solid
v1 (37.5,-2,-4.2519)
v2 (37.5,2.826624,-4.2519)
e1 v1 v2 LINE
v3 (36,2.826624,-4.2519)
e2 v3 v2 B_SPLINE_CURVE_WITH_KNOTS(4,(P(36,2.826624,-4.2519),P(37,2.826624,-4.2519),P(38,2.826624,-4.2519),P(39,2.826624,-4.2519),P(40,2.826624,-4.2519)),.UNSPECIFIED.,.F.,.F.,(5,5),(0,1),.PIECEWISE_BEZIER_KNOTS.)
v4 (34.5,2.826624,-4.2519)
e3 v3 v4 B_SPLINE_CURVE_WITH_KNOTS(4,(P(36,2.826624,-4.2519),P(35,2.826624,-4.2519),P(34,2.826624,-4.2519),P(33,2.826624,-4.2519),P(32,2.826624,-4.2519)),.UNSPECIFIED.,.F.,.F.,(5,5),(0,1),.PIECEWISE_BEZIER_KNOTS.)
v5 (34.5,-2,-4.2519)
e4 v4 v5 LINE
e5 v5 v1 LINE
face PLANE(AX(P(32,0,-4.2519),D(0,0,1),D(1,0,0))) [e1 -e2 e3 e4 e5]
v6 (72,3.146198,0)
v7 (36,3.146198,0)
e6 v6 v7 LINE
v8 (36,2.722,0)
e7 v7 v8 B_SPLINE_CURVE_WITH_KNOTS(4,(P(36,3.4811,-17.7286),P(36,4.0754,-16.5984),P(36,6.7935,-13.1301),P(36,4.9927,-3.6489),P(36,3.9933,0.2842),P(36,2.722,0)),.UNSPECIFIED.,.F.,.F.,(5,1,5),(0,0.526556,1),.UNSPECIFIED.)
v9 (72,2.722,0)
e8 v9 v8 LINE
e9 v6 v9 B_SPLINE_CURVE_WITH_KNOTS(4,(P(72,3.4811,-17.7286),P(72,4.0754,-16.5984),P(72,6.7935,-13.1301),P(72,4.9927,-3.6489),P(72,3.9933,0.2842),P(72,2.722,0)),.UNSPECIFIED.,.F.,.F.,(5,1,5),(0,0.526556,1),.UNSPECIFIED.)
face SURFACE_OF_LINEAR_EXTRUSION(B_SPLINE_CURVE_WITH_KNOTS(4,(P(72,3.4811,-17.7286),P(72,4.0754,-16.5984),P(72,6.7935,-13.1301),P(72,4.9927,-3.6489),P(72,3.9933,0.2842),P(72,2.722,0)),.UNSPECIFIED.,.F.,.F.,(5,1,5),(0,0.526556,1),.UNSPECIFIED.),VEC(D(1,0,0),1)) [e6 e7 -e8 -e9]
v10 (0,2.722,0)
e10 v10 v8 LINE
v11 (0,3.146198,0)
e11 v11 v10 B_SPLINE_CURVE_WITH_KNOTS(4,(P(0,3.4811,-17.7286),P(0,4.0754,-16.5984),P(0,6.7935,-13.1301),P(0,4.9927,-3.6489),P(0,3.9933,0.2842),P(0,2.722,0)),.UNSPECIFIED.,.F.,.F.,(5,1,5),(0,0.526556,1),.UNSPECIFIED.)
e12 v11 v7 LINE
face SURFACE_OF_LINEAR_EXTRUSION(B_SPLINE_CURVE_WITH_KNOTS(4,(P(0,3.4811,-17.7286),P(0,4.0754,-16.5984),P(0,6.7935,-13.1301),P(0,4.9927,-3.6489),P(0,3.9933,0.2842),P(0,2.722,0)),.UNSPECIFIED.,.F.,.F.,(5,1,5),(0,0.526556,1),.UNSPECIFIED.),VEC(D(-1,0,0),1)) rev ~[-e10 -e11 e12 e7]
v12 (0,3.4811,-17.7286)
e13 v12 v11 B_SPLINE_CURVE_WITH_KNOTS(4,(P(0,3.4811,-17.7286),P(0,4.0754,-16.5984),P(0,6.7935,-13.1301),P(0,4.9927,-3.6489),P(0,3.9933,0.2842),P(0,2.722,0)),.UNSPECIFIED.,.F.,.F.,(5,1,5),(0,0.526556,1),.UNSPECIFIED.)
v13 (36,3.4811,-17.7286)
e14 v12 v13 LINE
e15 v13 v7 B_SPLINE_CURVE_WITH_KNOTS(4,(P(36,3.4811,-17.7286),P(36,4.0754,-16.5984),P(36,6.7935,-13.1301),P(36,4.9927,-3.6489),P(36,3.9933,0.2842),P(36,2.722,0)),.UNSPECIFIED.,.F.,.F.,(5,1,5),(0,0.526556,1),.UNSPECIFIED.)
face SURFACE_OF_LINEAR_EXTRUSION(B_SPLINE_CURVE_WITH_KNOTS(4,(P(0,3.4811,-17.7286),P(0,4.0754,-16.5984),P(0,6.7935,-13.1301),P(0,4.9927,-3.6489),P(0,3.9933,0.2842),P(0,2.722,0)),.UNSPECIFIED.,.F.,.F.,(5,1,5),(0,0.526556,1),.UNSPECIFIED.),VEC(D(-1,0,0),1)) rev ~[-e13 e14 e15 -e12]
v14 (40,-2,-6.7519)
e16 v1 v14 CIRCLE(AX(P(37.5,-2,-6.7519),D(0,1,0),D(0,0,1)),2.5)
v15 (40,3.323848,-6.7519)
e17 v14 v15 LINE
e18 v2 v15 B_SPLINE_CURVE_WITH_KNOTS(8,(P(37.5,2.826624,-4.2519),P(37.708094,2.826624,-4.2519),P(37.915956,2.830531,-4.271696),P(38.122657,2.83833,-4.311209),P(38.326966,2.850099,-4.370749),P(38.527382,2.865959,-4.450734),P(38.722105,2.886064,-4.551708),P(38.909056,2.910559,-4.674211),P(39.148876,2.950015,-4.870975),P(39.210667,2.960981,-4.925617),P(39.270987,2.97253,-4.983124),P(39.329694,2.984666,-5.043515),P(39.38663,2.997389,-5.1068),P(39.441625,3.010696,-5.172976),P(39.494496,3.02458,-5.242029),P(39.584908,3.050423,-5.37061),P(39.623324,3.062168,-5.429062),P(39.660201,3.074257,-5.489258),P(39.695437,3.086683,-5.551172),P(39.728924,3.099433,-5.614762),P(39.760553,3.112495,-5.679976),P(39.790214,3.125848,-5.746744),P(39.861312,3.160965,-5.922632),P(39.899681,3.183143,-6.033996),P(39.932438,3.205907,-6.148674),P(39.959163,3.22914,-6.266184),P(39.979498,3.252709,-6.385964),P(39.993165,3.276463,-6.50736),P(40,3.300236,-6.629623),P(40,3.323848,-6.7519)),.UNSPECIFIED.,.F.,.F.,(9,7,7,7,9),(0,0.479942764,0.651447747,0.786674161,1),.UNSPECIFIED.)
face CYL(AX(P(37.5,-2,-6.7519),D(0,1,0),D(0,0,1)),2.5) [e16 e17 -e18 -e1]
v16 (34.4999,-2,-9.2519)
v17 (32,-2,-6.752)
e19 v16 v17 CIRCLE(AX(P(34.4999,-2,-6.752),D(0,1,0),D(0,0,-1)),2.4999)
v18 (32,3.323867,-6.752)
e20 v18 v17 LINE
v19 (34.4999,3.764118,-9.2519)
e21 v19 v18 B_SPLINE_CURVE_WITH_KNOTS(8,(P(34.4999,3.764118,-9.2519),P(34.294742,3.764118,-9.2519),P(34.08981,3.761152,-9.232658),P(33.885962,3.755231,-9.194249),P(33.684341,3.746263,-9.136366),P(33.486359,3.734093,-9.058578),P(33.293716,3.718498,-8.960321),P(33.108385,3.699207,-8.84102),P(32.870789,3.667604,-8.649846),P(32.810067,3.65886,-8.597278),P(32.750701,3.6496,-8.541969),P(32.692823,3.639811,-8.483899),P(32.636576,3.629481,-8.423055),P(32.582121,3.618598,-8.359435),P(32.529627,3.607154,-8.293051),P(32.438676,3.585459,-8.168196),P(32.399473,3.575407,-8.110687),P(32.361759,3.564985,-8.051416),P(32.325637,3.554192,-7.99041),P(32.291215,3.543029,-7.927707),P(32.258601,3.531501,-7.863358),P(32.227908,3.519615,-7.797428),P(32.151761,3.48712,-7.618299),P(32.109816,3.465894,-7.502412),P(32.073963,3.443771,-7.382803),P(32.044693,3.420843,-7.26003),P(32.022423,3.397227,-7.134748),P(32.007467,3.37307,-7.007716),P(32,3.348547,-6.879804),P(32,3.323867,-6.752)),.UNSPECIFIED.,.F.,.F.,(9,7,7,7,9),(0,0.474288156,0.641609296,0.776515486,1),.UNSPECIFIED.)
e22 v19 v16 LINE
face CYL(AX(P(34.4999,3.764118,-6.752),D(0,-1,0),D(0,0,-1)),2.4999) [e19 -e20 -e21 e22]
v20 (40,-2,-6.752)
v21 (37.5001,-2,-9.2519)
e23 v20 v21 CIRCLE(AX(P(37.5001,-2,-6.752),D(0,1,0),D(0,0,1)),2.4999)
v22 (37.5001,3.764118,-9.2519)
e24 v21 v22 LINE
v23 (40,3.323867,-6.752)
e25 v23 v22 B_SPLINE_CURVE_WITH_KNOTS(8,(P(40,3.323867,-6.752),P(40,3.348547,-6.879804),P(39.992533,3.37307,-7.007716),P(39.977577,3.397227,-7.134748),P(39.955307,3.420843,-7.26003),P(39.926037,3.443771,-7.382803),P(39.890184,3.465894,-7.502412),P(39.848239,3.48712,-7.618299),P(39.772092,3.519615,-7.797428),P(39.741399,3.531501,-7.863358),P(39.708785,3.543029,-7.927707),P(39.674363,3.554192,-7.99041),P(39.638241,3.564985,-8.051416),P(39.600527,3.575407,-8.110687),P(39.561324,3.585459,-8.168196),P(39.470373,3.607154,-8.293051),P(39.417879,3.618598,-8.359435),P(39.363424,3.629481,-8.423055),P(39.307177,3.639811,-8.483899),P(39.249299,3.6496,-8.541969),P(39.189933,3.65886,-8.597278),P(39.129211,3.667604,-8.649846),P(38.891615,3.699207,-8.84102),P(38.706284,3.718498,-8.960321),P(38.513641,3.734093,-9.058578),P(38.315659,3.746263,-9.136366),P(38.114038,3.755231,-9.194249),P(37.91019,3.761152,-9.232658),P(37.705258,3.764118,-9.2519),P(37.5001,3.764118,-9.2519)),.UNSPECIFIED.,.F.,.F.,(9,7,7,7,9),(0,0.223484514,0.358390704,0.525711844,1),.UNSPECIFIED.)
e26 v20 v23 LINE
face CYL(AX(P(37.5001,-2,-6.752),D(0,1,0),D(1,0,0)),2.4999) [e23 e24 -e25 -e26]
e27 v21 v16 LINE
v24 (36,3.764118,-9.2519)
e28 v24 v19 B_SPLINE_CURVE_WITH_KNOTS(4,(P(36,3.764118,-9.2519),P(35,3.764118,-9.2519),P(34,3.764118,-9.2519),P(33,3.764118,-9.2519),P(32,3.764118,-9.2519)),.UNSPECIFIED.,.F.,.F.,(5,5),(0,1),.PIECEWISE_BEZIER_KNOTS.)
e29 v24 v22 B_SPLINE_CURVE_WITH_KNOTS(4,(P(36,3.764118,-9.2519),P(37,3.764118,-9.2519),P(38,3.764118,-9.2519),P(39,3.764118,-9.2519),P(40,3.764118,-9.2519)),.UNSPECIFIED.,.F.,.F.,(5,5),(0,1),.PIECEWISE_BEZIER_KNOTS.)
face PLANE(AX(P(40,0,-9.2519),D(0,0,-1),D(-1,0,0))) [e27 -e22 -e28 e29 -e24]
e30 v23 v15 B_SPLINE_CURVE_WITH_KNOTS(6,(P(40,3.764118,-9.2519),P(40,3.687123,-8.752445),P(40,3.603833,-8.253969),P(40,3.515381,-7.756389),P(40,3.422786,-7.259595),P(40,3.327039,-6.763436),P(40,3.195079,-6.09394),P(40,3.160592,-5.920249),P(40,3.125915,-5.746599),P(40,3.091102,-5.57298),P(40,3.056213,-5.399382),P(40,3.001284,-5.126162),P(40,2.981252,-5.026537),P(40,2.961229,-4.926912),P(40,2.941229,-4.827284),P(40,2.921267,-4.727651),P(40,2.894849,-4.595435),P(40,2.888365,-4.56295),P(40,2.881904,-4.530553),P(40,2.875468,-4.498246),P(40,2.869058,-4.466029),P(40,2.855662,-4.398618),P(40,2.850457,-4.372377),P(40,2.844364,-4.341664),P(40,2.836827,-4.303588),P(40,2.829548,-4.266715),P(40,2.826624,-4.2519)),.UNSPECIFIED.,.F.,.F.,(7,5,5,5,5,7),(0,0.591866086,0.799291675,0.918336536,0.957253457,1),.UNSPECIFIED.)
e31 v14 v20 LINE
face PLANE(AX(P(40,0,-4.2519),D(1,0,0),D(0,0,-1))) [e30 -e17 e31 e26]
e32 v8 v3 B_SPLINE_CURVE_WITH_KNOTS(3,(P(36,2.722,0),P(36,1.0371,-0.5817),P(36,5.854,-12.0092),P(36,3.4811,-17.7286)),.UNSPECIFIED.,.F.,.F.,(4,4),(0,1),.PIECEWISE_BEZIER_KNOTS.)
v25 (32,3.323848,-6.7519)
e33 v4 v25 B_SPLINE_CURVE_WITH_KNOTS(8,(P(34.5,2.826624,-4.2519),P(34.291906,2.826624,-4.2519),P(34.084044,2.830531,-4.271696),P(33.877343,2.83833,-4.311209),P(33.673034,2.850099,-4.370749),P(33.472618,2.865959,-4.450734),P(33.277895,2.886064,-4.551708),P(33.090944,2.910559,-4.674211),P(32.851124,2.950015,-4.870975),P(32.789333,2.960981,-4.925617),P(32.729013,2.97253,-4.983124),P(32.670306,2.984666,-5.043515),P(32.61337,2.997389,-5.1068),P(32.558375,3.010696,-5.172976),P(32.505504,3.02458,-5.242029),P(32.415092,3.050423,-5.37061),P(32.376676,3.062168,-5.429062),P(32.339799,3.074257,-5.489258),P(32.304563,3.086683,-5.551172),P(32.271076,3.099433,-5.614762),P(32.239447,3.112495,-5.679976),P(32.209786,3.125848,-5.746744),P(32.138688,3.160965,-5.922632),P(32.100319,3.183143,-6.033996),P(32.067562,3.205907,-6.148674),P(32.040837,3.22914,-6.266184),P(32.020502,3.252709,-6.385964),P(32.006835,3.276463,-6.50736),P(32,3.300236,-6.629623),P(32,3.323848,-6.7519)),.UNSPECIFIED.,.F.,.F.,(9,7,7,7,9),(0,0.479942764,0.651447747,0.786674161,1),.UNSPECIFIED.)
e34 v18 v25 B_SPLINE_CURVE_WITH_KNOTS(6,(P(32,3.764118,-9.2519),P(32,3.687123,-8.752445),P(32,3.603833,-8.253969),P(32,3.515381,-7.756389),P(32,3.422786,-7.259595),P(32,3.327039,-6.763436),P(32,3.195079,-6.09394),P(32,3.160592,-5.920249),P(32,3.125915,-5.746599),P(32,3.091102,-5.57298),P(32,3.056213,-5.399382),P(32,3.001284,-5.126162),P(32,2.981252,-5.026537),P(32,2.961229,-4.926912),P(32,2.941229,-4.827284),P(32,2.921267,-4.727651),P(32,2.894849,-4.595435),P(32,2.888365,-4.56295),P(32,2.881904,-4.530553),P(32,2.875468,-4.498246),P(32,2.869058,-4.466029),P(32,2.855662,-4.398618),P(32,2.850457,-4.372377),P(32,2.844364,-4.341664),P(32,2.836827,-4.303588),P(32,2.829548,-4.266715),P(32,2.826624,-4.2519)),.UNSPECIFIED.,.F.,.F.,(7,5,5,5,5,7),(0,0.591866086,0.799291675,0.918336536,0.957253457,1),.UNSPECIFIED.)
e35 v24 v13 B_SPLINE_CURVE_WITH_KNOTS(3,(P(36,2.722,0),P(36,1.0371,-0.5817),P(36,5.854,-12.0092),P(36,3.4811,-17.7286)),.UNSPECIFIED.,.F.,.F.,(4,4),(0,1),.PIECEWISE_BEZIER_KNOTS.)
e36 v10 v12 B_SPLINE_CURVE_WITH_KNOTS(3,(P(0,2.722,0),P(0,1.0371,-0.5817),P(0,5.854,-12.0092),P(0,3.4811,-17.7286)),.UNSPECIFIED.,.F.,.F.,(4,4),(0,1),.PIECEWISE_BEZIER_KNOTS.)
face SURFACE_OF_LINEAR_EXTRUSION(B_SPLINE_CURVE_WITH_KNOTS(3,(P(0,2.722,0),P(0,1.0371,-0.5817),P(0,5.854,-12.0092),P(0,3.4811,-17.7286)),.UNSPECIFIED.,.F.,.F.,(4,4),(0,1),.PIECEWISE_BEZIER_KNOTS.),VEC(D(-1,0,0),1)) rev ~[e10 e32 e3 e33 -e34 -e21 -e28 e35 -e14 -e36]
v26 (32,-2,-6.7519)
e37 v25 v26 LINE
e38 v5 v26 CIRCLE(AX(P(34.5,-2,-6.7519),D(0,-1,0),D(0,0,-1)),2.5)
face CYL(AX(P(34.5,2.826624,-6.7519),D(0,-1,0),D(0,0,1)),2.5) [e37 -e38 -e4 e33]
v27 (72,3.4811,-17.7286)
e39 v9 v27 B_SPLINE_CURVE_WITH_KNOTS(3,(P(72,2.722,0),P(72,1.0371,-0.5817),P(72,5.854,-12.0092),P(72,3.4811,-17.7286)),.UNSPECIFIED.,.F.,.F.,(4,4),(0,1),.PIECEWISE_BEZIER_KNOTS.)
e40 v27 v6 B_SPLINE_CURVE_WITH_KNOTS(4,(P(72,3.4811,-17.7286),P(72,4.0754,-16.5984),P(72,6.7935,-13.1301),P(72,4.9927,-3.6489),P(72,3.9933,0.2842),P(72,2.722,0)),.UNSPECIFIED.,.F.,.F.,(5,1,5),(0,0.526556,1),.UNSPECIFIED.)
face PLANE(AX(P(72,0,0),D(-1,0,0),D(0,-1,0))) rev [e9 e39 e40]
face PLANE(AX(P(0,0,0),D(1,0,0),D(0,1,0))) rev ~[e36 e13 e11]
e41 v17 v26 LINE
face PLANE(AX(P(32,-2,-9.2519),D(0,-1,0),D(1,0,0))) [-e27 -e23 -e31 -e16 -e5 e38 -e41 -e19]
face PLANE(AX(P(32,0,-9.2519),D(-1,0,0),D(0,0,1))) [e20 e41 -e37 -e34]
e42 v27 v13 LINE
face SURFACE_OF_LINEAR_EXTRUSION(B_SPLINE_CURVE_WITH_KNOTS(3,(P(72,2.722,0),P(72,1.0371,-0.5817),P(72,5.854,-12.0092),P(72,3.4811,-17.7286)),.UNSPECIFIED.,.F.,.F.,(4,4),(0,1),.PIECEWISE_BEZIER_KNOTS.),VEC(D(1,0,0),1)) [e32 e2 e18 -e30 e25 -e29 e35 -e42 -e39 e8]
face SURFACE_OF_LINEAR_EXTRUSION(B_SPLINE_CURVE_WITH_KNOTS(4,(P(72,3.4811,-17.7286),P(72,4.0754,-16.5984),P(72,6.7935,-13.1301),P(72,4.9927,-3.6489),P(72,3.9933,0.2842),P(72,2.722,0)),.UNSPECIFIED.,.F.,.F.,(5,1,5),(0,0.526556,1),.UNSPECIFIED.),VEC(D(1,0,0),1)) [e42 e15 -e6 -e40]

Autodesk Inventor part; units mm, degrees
ref_plane "YZ Plane" through (0, 0, 0) normal (1, 0, 0) x (0, 1, 0)
ref_plane "XZ Plane" through (0, 0, 0) normal (0, 1, 0) x (-1, 0, 0)
ref_plane "XY Plane" through (0, 0, 0) normal (0, 0, 1) x (1, 0, 0)
sketch "Sketch1" plane through (0, 0, 0) normal (1, 0, 0) x (0, 1, 0)
  line L0 (0, 0) -> (10, 0)
  line L1 (10, 0) -> (10, -18)
  line L2 (10, -18) -> (0, -18)
  line L3 (0, -18) -> (0, 0)
  spline S0 degree 4 poles (3.4811, -17.7286) (4.0754, -16.5984) (6.7935, -13.1301) (4.9927, -3.6489) (3.9933, 0.2842) (2.722, 0) knots 0 0 0 0 0 0.526556 1 1 1 1 1
  spline S1 degree 3 poles (2.722, 0) (1.0371, -0.5817) (5.854, -12.0092) (3.4811, -17.7286) knots 0 0 0 0 1 1 1 1
  point P0 (4.392, -16.0283)
  point P1 (5.4548, -11.4431)
  point P2 (4.8476, -3.8821)
  point P3 (3.6937, -0.39)
  point P4 (2.3577, -0.8758)
  point P5 (3.4812, -7.5865)
  dimension "d0" = 10
  dimension "d1" = 18
extrude "Extrusion1" add sketch "Sketch1" along normal blind 36 contours S0 L0 | L0 S0 S1
sketch "Sketch2" plane through (36, 0, 0) normal (1, 0, 0) x (0, 0, -1)
  line L0 (4.2519, 4) -> (9.2519, 4)
  line L1 (9.2519, 4) -> (9.2519, 0)
  line L2 (9.2519, 0) -> (4.2519, 0)
  line L3 (4.2519, 0) -> (4.2519, 4)
  point P0 (0, 0)
  dimension "d4" = 5
  dimension "d7" = 4
extrude "Extrusion2" add sketch "Sketch2" against normal blind 4
mirror "Mirror1" about plane through (36, 4.1406, -8.6966) normal (1, 0, 0)
sketch "Sketch3" plane through (32, 0, -9.2519) normal (0, -1, 0) x (1, 0, 0)
  line L0 (0, 5) -> (8, 5)
  line L1 (8, 5) -> (8, 0)
  line L2 (8, 0) -> (0, 0)
  line L3 (0, 0) -> (0, 5)
  point P0 (-32, 9.2519)
extrude "Extrusion3" add sketch "Sketch3" along normal blind 2
fillet "Fillet1" radius 2.5 1 edges at (40, 0.4133, -4.2519)
fillet "Fillet2" radius 2.5 1 edges at (32, 0.4133, -4.2519)
fillet "Fillet3" radius 2.5 1 edges at (40, 0.8821, -9.2519)
fillet "Fillet4" radius 2.5 1 edges at (32, 0.8821, -9.2519)
properties part number "2015 Back Spoiler 1"
